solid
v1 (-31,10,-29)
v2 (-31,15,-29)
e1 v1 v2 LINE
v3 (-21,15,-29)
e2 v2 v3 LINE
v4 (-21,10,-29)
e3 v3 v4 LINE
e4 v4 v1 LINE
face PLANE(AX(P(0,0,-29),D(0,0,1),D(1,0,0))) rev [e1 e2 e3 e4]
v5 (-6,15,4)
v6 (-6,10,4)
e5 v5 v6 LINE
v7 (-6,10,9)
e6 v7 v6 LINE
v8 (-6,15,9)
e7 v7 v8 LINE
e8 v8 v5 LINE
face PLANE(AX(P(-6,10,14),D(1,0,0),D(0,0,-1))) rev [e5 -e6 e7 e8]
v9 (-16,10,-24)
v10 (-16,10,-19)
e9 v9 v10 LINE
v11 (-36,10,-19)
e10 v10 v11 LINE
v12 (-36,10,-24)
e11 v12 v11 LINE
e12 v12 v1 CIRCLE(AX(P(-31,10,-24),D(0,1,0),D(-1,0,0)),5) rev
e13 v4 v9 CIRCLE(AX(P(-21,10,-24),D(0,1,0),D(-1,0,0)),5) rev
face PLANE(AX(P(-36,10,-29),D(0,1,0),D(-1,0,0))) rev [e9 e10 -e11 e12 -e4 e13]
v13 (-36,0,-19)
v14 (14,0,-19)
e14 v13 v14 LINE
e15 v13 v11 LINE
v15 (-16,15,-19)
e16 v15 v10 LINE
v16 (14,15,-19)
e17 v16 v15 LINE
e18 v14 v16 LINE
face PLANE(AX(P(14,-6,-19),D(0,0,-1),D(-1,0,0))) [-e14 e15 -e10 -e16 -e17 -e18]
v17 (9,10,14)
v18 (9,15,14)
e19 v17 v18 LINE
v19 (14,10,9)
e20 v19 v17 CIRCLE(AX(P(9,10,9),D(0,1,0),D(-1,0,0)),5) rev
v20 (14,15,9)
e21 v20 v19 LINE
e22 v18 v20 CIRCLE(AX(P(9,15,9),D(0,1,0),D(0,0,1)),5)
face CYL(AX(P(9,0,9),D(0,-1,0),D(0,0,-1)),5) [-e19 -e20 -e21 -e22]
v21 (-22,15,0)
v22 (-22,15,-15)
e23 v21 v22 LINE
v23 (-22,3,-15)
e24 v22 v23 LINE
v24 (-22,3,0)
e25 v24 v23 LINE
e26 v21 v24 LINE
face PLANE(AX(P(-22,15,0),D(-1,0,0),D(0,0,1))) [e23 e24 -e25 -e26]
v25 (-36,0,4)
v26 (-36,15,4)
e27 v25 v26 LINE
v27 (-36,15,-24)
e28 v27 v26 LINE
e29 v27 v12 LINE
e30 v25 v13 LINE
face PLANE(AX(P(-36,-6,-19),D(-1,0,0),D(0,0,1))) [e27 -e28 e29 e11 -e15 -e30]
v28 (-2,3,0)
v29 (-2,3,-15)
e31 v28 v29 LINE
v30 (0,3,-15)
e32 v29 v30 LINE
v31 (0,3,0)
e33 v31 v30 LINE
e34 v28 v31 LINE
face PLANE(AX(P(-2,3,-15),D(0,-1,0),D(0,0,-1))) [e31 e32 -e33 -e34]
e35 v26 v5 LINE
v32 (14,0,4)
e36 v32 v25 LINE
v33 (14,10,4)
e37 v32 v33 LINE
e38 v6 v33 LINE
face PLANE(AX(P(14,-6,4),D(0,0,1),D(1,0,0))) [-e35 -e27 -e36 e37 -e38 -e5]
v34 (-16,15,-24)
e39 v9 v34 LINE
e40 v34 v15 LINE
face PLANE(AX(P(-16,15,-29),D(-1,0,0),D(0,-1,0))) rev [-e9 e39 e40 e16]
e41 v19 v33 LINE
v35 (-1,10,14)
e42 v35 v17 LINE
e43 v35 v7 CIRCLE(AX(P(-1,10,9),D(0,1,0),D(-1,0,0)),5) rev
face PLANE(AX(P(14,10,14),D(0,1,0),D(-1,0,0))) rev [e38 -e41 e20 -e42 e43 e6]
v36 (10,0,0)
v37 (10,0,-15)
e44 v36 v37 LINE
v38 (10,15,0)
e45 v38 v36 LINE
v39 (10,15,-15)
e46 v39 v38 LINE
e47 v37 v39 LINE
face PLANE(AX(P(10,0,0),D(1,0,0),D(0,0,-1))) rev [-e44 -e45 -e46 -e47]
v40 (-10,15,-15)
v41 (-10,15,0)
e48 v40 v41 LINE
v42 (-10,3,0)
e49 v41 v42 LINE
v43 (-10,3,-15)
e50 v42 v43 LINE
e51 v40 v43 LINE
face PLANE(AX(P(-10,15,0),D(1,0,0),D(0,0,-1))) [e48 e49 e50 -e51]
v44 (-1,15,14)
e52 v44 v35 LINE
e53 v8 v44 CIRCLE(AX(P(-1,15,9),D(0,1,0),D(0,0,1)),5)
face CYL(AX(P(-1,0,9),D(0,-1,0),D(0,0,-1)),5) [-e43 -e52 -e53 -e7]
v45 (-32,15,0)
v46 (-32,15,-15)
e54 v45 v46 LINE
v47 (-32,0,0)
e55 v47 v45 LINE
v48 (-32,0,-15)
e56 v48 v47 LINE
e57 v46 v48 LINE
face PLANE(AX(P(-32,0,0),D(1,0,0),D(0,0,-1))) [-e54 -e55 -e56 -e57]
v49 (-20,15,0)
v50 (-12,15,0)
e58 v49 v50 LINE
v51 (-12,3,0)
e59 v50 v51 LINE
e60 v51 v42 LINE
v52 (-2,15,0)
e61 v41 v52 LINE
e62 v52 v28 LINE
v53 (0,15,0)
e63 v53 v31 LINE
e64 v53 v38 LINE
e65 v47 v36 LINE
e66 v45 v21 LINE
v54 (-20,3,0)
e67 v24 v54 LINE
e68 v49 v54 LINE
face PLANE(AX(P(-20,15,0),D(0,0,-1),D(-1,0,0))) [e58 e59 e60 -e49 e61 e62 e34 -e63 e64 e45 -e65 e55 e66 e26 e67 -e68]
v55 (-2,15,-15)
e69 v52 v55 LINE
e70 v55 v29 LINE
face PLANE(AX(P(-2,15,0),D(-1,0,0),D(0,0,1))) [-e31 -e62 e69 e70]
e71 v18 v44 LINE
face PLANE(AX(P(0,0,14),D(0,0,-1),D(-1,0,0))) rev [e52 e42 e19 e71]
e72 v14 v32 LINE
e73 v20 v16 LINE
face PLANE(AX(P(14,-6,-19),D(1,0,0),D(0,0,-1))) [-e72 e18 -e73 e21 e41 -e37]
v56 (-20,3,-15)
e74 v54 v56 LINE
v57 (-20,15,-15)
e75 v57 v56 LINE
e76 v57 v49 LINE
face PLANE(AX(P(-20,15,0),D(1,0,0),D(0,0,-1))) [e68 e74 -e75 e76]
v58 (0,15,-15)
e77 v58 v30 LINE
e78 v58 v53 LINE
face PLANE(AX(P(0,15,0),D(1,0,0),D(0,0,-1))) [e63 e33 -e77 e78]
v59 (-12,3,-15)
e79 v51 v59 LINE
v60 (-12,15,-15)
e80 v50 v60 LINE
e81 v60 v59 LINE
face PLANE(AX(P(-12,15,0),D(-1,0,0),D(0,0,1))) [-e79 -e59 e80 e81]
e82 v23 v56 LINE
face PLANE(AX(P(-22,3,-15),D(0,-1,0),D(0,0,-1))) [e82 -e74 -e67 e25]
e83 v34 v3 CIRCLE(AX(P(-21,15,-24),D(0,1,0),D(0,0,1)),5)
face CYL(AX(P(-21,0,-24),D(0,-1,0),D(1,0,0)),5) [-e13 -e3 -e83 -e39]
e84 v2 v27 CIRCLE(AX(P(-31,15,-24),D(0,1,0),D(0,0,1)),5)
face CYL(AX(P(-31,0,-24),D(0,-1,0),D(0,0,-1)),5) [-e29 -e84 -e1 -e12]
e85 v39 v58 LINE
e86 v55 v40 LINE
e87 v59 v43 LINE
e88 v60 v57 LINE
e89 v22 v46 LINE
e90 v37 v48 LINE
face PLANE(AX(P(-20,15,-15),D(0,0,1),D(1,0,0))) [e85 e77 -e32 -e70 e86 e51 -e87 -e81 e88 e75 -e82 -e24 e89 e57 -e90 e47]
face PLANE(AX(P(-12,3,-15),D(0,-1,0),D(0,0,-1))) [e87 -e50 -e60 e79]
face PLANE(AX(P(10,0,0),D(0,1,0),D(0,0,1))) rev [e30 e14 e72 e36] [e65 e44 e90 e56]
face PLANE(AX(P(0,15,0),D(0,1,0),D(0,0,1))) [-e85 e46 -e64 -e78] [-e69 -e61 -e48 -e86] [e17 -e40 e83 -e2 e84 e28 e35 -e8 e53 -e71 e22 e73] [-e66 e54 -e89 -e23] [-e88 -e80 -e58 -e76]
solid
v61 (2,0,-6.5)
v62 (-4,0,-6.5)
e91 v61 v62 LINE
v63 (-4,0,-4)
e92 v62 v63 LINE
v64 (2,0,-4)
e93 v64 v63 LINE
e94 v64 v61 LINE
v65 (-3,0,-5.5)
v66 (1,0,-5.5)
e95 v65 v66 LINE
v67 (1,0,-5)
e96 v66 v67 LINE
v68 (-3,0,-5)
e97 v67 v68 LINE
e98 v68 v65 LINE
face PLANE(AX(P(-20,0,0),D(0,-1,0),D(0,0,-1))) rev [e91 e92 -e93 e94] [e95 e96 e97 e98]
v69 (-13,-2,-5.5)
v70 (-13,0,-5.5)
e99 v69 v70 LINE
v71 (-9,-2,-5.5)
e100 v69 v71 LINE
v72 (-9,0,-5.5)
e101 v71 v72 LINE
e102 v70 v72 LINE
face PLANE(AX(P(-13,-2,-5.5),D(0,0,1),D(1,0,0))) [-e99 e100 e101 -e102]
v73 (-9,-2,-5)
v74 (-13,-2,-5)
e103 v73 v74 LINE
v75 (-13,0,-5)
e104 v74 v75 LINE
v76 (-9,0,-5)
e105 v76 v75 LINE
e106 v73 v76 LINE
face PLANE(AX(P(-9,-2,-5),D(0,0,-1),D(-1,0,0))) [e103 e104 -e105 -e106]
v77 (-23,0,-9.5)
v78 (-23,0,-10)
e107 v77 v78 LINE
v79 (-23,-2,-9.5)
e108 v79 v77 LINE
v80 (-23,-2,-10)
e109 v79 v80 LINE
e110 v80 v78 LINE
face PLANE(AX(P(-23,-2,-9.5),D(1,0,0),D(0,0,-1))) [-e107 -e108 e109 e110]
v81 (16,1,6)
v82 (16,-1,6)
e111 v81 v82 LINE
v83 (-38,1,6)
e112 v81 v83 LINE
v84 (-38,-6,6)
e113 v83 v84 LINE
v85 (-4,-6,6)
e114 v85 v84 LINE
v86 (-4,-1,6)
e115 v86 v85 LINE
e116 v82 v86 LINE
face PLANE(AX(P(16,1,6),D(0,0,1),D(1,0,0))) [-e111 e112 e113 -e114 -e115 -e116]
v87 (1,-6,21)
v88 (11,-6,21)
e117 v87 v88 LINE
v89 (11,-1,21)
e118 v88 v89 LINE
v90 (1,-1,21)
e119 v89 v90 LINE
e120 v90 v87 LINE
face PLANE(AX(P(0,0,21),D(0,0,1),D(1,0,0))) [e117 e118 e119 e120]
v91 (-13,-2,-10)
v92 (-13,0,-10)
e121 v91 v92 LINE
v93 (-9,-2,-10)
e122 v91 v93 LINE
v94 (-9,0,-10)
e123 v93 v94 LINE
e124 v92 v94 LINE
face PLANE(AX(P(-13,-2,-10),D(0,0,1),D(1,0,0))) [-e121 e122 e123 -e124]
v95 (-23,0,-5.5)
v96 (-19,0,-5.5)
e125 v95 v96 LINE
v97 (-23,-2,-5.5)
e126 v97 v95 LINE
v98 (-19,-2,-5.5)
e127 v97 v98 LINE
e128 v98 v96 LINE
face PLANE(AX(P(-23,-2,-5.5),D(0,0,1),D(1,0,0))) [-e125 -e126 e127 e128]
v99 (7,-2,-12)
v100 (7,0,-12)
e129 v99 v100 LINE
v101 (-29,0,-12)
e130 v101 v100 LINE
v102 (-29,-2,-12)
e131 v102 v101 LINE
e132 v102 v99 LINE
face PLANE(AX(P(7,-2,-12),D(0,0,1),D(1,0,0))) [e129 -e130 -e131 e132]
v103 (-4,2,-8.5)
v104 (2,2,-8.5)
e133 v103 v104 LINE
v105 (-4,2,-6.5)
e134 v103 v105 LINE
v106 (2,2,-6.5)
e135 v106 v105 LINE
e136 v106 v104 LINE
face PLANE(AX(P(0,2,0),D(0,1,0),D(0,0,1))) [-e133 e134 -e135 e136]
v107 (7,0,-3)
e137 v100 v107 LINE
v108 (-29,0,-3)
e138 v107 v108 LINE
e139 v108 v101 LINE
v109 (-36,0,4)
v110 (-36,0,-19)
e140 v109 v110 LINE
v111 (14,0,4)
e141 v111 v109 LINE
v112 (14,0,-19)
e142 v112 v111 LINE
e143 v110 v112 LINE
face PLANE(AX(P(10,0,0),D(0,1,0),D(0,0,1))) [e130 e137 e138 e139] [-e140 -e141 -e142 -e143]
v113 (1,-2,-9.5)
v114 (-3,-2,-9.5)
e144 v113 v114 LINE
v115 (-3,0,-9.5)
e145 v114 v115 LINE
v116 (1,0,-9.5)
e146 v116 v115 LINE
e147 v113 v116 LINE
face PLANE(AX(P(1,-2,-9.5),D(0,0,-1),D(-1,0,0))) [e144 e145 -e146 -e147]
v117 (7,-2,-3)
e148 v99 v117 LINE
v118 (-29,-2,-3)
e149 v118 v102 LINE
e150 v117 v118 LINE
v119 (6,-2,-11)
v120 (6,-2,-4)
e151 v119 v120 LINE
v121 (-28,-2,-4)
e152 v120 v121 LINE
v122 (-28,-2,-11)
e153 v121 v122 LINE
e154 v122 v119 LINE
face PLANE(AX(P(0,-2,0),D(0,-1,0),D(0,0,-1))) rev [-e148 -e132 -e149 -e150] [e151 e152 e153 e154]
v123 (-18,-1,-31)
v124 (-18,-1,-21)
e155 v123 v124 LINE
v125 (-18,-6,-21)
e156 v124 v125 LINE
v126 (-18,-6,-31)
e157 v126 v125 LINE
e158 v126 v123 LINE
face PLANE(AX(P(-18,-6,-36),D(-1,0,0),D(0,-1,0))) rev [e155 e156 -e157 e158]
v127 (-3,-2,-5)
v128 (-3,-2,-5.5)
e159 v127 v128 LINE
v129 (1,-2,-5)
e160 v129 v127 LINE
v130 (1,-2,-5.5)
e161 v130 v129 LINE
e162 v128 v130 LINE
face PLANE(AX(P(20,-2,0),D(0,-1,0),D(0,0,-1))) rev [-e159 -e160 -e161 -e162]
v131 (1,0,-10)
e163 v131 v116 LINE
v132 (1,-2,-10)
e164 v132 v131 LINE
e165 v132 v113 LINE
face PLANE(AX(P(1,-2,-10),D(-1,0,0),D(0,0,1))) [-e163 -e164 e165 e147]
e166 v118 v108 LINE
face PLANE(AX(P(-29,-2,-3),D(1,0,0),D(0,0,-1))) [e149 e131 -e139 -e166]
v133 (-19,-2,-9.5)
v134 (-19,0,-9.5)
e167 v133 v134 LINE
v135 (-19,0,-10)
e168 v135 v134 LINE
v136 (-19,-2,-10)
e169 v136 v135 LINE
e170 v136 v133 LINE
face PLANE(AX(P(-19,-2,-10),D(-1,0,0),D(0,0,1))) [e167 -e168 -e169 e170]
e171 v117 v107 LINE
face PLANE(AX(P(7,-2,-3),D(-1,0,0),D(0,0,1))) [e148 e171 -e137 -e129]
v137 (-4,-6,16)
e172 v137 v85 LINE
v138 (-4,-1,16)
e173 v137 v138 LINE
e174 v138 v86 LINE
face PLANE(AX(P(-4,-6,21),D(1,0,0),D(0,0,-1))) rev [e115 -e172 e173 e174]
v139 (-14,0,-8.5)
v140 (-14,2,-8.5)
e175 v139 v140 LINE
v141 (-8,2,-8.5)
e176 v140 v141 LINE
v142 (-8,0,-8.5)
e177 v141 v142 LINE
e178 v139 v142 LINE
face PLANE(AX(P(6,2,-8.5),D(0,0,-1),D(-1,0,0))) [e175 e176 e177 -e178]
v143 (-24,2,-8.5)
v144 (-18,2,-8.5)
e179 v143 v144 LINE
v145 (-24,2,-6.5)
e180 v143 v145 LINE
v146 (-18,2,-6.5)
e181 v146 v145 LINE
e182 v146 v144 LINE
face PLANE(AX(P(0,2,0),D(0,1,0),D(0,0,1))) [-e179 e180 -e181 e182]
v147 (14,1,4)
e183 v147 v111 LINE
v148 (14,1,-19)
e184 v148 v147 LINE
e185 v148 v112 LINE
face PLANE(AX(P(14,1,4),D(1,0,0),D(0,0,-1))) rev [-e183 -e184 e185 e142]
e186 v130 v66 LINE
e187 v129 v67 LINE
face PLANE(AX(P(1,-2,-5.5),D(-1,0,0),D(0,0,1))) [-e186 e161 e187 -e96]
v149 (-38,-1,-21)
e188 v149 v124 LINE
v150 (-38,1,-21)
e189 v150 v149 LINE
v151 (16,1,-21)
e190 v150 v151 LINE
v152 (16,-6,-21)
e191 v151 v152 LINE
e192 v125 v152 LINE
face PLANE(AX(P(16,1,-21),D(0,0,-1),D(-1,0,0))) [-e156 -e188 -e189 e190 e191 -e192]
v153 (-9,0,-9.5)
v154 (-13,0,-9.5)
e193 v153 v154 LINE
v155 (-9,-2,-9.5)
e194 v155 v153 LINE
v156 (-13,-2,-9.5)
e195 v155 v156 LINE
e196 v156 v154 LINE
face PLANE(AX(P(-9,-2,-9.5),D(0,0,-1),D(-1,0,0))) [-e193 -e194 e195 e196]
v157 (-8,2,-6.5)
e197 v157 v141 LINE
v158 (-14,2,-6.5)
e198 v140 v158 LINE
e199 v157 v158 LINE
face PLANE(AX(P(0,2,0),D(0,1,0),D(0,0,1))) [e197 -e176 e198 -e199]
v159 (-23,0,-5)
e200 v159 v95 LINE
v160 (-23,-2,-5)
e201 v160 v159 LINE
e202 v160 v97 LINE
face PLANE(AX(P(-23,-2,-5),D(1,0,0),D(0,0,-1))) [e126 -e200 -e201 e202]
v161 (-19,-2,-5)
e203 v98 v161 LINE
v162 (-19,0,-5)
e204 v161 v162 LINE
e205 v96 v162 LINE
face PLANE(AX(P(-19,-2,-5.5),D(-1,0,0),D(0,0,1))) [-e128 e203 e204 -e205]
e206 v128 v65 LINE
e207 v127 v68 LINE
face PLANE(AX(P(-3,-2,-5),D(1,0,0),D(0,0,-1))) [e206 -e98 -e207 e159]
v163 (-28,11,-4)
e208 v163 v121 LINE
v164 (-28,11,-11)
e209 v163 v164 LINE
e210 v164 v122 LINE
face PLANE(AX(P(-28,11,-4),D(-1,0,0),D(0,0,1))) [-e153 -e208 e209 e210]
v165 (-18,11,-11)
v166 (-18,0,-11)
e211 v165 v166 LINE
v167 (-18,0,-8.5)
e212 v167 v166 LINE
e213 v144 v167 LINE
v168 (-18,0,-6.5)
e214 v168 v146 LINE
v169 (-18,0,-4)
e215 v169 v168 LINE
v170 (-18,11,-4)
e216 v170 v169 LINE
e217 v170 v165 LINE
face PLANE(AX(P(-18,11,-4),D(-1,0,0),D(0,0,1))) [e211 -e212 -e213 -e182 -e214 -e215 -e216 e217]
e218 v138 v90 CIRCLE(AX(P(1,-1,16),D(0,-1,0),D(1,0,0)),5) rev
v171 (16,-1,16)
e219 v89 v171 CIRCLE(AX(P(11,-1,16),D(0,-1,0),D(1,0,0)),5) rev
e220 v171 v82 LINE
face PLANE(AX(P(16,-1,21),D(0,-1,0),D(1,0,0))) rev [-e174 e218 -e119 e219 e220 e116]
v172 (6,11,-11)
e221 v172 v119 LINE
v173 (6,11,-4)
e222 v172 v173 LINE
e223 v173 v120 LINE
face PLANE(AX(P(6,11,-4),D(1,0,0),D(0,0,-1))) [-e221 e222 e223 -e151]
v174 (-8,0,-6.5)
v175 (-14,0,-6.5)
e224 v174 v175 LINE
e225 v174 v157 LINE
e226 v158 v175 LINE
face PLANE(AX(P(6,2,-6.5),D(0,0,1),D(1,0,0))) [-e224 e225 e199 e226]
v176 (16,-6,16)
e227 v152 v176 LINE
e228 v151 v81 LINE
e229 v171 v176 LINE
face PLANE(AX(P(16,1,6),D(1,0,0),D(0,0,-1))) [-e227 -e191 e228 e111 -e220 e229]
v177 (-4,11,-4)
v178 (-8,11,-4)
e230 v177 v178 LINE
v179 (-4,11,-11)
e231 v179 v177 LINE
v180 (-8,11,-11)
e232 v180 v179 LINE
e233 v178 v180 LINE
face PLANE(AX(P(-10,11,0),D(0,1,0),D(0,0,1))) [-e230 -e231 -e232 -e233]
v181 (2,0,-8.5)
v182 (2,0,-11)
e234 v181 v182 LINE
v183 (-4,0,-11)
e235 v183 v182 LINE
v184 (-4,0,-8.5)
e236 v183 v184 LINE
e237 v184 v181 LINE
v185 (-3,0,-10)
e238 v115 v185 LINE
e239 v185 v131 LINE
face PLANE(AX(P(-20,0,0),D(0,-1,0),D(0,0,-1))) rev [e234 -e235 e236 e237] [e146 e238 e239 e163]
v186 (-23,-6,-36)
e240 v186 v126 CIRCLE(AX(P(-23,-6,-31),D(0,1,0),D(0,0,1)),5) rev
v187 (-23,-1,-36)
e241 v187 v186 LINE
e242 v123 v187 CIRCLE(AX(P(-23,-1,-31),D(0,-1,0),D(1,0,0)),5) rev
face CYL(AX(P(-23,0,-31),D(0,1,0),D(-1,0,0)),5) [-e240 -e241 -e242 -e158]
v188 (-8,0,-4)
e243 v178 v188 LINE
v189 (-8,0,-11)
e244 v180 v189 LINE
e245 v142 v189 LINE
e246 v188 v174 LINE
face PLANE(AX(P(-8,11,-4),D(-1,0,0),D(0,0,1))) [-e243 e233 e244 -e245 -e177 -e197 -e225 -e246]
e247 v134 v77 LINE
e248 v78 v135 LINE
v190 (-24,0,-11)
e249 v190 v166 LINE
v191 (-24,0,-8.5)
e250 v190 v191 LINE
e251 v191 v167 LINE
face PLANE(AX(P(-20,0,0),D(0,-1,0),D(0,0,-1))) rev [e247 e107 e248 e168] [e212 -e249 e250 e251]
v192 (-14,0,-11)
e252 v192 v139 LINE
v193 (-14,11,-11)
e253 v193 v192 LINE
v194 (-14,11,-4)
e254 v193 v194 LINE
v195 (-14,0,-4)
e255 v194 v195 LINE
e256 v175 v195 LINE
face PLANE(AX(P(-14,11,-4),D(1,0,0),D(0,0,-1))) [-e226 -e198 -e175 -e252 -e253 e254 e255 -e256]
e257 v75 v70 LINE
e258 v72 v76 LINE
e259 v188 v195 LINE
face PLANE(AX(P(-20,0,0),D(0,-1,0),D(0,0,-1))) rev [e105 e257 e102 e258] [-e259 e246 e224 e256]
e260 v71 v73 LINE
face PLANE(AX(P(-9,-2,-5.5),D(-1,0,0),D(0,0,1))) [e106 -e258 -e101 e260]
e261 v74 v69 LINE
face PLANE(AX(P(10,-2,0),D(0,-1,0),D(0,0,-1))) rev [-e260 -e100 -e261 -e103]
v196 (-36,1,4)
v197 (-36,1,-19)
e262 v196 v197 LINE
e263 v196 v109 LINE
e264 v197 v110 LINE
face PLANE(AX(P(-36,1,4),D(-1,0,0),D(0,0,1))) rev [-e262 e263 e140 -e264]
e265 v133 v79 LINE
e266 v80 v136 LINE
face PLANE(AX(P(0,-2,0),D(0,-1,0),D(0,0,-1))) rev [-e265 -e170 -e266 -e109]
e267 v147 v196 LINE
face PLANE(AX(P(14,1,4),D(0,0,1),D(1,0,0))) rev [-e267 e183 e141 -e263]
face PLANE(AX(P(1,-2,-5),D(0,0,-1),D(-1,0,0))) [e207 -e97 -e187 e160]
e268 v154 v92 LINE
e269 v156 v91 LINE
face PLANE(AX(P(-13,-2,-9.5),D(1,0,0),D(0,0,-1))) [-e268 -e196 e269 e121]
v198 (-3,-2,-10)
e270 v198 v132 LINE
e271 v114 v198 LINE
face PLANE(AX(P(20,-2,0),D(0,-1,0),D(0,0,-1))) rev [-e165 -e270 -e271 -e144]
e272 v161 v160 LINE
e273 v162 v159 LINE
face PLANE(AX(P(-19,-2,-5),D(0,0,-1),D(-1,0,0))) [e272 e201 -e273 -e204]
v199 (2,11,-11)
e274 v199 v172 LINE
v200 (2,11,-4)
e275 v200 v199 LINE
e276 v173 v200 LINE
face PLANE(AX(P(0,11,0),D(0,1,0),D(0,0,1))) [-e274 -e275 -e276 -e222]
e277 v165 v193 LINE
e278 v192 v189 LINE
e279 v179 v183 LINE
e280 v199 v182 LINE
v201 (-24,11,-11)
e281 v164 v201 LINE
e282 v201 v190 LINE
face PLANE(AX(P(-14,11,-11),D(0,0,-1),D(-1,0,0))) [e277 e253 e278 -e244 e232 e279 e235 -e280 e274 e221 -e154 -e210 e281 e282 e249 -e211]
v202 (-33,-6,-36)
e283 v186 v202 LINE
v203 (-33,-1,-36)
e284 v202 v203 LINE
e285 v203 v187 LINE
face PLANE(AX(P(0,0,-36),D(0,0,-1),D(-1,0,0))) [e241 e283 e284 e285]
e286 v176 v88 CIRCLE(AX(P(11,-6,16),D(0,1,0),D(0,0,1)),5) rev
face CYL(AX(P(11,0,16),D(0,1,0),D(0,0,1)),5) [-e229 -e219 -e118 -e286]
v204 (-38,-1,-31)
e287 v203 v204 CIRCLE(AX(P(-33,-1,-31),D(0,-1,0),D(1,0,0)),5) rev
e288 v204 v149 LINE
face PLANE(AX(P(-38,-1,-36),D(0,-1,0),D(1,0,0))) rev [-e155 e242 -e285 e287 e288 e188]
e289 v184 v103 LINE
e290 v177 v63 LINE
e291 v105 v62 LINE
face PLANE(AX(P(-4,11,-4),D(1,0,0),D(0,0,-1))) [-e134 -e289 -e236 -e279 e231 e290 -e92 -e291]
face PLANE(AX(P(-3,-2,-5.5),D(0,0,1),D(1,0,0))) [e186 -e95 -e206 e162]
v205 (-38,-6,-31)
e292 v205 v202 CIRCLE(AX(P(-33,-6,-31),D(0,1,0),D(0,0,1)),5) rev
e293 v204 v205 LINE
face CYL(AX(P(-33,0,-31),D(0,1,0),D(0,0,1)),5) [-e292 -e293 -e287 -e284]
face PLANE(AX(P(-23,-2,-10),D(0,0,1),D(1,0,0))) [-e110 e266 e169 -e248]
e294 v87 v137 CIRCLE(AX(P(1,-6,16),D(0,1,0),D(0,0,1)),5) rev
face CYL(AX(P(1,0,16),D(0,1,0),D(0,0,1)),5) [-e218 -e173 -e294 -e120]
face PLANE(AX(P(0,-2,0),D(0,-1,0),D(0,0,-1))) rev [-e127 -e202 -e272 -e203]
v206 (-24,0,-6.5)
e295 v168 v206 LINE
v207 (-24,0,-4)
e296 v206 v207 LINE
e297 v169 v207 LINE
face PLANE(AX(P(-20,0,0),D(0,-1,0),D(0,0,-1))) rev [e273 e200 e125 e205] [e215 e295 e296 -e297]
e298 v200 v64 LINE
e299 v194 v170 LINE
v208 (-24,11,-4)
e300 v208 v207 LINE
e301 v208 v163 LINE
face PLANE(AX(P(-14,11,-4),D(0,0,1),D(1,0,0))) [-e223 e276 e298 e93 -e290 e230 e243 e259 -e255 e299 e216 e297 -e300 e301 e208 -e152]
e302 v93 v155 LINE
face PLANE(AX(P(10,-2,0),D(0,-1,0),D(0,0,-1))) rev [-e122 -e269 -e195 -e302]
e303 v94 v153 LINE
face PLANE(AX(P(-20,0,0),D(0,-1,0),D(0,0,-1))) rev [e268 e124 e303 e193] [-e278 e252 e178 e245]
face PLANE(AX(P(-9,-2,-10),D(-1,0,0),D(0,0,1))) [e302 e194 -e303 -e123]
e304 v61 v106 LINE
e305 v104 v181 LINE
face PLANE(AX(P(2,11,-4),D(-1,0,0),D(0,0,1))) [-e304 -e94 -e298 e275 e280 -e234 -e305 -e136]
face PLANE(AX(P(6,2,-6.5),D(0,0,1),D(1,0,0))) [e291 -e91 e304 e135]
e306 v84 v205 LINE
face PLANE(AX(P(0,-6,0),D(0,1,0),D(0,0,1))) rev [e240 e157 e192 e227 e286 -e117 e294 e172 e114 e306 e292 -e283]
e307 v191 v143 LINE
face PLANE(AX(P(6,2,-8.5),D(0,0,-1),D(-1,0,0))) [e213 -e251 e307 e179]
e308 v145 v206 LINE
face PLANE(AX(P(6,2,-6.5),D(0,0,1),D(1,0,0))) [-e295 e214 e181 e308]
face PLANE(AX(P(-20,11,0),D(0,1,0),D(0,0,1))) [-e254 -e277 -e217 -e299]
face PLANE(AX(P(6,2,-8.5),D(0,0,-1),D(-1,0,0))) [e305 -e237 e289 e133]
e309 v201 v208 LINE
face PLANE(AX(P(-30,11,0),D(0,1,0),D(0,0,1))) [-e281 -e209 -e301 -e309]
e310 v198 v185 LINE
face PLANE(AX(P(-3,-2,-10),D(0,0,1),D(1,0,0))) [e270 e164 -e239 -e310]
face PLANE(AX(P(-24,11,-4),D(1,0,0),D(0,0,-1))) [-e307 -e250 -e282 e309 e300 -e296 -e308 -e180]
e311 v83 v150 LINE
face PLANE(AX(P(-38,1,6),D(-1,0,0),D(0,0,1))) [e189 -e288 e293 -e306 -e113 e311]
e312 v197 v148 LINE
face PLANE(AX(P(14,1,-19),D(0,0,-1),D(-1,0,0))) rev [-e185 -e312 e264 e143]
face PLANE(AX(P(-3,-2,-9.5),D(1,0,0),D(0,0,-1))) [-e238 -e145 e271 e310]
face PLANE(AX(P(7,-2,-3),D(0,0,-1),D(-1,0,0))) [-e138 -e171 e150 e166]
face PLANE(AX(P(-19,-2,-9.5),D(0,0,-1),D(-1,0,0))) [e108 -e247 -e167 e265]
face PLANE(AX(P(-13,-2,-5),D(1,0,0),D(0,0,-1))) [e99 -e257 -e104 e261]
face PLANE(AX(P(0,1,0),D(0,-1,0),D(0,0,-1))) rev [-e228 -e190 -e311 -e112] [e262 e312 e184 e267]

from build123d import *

# Parameters (mm, degrees)
SKETCH1_W                = 8
SKETCH1_H                = 15
BOSS_EXTRUDE1_DEPTH      = 15
SKETCH2_W                = 4
SKETCH2_H                = 7
CUT_EXTRUDE1_DEPTH       = 11
SKETCH3_W                = 15
SKETCH3_H                = 3
BOSS_EXTRUDE2_DEPTH      = 2
LPATTERN1_COUNT          = 4
LPATTERN1_PITCH          = 10
SKETCH4_W                = 15
SKETCH4_H                = 12
BOSS_EXTRUDE3_DEPTH      = 2
SKETCH5_W                = 15
SKETCH5_H                = 15
BOSS_EXTRUDE4_DEPTH      = 2
SKETCH6_W                = 34
SKETCH6_H                = 2
CUT_EXTRUDE2_DEPTH       = 2
SKETCH7_W                = 36
SKETCH7_H                = 9
SKETCH7_W_2              = 34
SKETCH7_H_2              = 7
BOSS_EXTRUDE5_DEPTH      = 2
SKETCH8_W                = 4
SKETCH8_H                = 0.5
BOSS_EXTRUDE6_DEPTH      = 2
LPATTERN2_COUNT          = 3
LPATTERN2_PITCH          = 10
BOSS_EXTRUDE7_DEPTH      = 15
BOSS_EXTRUDE7_DEPTH_BACK = 6
SKETCH9_W                = 50
SKETCH9_H                = 23
SPLIT1_START             = -6
SPLIT1_OUTLINE_W         = 50
SPLIT1_OUTLINE_H         = 23
SPLIT1_DEPTH             = 6
SPLIT1_2_OUTLINE_W       = 4
SPLIT1_2_OUTLINE_H       = 7
SPLIT1_2_DEPTH           = 11
SPLIT1_3_OUTLINE_W       = 6
SPLIT1_3_OUTLINE_H       = 2
SPLIT1_3_DEPTH           = 2
SPLIT1_START_2           = -19
SPLIT1_4_DEPTH           = 23
SPLIT1_START_3           = -11
SPLIT1_5_DEPTH           = 7
SPLIT1_6_OUTLINE_W       = 36
SPLIT1_6_OUTLINE_H       = 2
SPLIT1_6_DEPTH           = 7
SPLIT1_START_4           = -3
SPLIT1_7_OUTLINE_W       = 36
SPLIT1_7_OUTLINE_H       = 2
SPLIT1_7_DEPTH           = 7
SPLIT1_START_5           = -8.5
SPLIT1_8_DEPTH           = 2
SPLIT1_START_6           = -9.5
SPLIT1_9_OUTLINE_W       = 4
SPLIT1_9_OUTLINE_H       = 2
SPLIT1_9_DEPTH           = 4
SPLIT1_10_OUTLINE_W      = 4
SPLIT1_10_OUTLINE_H      = 2
SPLIT1_10_DEPTH          = 1
SPLIT1_START_7           = -5
SPLIT1_11_OUTLINE_W      = 4
SPLIT1_11_OUTLINE_H      = 2
SPLIT1_11_DEPTH          = 1
SKETCH11_W               = 20
SKETCH11_H               = 5
BOSS_EXTRUDE8_DEPTH      = 10
SKETCH12_W               = 20
SKETCH12_H               = 5
BOSS_EXTRUDE9_DEPTH      = 10
FILLET1_R                = 5
SKETCH13_W               = 54
SKETCH13_H               = 27
SKETCH13_W_2             = 50
SKETCH13_H_2             = 23
BOSS_EXTRUDE11_DEPTH     = 7
SKETCH14_W               = 20
SKETCH14_H               = 5
BOSS_EXTRUDE12_DEPTH     = 15
SKETCH15_W               = 20
SKETCH15_H               = 5
BOSS_EXTRUDE13_DEPTH     = 15
FILLET2_R                = 5


# Read off the part's stored shape, not the designer's step: Split1
with BuildPart() as part:
    # Sketch1 → Boss-Extrude1 (new body)
    with BuildSketch(Plane(origin=(0, 0, 0), x_dir=(1, 0, 0), z_dir=(0, 1, 0))):
        with Locations((4, 7.5)):
            Rectangle(SKETCH1_W, SKETCH1_H)
    extrude(amount=BOSS_EXTRUDE1_DEPTH)

    # Sketch2 → Cut-Extrude1 (cut)
    with BuildSketch(Plane.XZ):
        with Locations((4, -7.5)):
            Rectangle(SKETCH2_W, SKETCH2_H)
    extrude(amount=-CUT_EXTRUDE1_DEPTH, mode=Mode.SUBTRACT)

    # Sketch3 → Boss-Extrude2 (add)
    with BuildSketch(Plane.ZY):
        with Locations((-7.5, 1.5)):
            Rectangle(SKETCH3_W, SKETCH3_H)
    extrude(amount=BOSS_EXTRUDE2_DEPTH)


with BuildPart() as lpattern1_1:
    # LPattern1: pattern copy
    add(part.part.moved(Location(Vector(-1, 0, 0) * (1 * LPATTERN1_PITCH))))


with BuildPart() as lpattern1_2:
    # LPattern1: pattern copy
    add(part.part.moved(Location(Vector(-1, 0, 0) * (2 * LPATTERN1_PITCH))))


with BuildPart() as lpattern1_3:
    # LPattern1: pattern copy
    add(part.part.moved(Location(Vector(-1, 0, 0) * (3 * LPATTERN1_PITCH))))


with BuildPart() as lpattern1_2_1:
    add(lpattern1_2.part)

    # Combine1: union LPattern1_1, part, LPattern1_3
    add(lpattern1_1.part)
    add(part.part)
    add(lpattern1_3.part)

    # Sketch4 → Boss-Extrude3 (add)
    with BuildSketch(Plane.ZY.offset(30)):
        with Locations((-7.5, 9)):
            Rectangle(SKETCH4_W, SKETCH4_H)
    extrude(amount=BOSS_EXTRUDE3_DEPTH)

    # Sketch5 → Boss-Extrude4 (add)
    with BuildSketch(Plane(origin=(8, 0, 0), x_dir=(0, 0, -1), z_dir=(1, 0, 0))):
        with Locations((7.5, 7.5)):
            Rectangle(SKETCH5_W, SKETCH5_H)
    extrude(amount=BOSS_EXTRUDE4_DEPTH)

    # Sketch6 → Cut-Extrude2 (cut)
    with BuildSketch(Plane(origin=(0, 0, 0), x_dir=(-1, 0, 0), z_dir=(0, -1, 0))):
        with Locations((11, 7.5)):
            Rectangle(SKETCH6_W, SKETCH6_H)
    extrude(amount=-CUT_EXTRUDE2_DEPTH, mode=Mode.SUBTRACT)

    # Sketch7 → Boss-Extrude5 (add)
    with BuildSketch(Plane.XZ):
        with Locations((-11, -7.5)):
            Rectangle(SKETCH7_W, SKETCH7_H)
        with Locations((-11, -7.5)):
            Rectangle(SKETCH7_W_2, SKETCH7_H_2, mode=Mode.SUBTRACT)
    extrude(amount=BOSS_EXTRUDE5_DEPTH)

    # Sketch8 → Boss-Extrude6 (add)
    with BuildSketch(Plane.XZ):
        with Locations((-21, -9.75)):
            Rectangle(SKETCH8_W, SKETCH8_H)
        with Locations((-21, -5.25)):
            Rectangle(SKETCH8_W, SKETCH8_H)
    boss_extrude6 = extrude(amount=BOSS_EXTRUDE6_DEPTH)

    # LPattern2: Boss-Extrude6 ×3
    with Locations(*[(i * LPATTERN2_PITCH, 0, 0) for i in range(1, LPATTERN2_COUNT)]):
        add(boss_extrude6)


with BuildPart() as body_2:
    # Sketch9 → Boss-Extrude7 (new, two sides: drawn at the far end of the back side and taken through both)
    with BuildSketch(Plane(origin=(0, 0, 0), x_dir=(1, 0, 0), z_dir=(0, 1, 0)).offset(-BOSS_EXTRUDE7_DEPTH_BACK)):
        with Locations((-11, 7.5)):
            Rectangle(SKETCH9_W, SKETCH9_H)
    extrude(amount=BOSS_EXTRUDE7_DEPTH + BOSS_EXTRUDE7_DEPTH_BACK)

    # Combine2: cut LPattern1_2
    add(lpattern1_2_1.part, mode=Mode.SUBTRACT)

    # Split1 outline → Split1 (cut)
    with BuildSketch(Plane(origin=(0, 0, 0), x_dir=(1, 0, 0), z_dir=(0, 1, 0)).offset(SPLIT1_START)):
        with Locations((-11, 7.5)):
            Rectangle(SPLIT1_OUTLINE_W, SPLIT1_OUTLINE_H)
    extrude(amount=SPLIT1_DEPTH, mode=Mode.SUBTRACT)

    # Split1 2 outline → Split1 2 (cut)
    with BuildSketch(Plane(origin=(0, 0, 0), x_dir=(1, 0, 0), z_dir=(0, 1, 0))):
        with Locations((-26, 7.5)):
            Rectangle(SPLIT1_2_OUTLINE_W, SPLIT1_2_OUTLINE_H)
        with Locations((-16, 7.5)):
            Rectangle(SPLIT1_2_OUTLINE_W, SPLIT1_2_OUTLINE_H)
        with Locations((-6, 7.5)):
            Rectangle(SPLIT1_2_OUTLINE_W, SPLIT1_2_OUTLINE_H)
        with Locations((4, 7.5)):
            Rectangle(SPLIT1_2_OUTLINE_W, SPLIT1_2_OUTLINE_H)
    extrude(amount=SPLIT1_2_DEPTH, mode=Mode.SUBTRACT)

    # Split1 3 outline → Split1 3 (cut)
    with BuildSketch(Plane(origin=(0, 0, 0), x_dir=(1, 0, 0), z_dir=(0, 1, 0))):
        with Locations((-21, 7.5)):
            Rectangle(SPLIT1_3_OUTLINE_W, SPLIT1_3_OUTLINE_H)
        with Locations((-11, 7.5)):
            Rectangle(SPLIT1_3_OUTLINE_W, SPLIT1_3_OUTLINE_H)
        with Locations((-1, 7.5)):
            Rectangle(SPLIT1_3_OUTLINE_W, SPLIT1_3_OUTLINE_H)
    extrude(amount=SPLIT1_3_DEPTH, mode=Mode.SUBTRACT)

    # Sketch11 → Boss-Extrude8 (add)
    with BuildSketch(Plane.XY.offset(4)):
        with Locations((4, 12.5)):
            Rectangle(SKETCH11_W, SKETCH11_H)
    extrude(amount=BOSS_EXTRUDE8_DEPTH)

    # Sketch12 → Boss-Extrude9 (add)
    with BuildSketch(Plane(origin=(0, 0, -19), x_dir=(-1, 0, 0), z_dir=(0, 0, -1))):
        with Locations((26, 12.5)):
            Rectangle(SKETCH12_W, SKETCH12_H)
    extrude(amount=BOSS_EXTRUDE9_DEPTH)

    # Fillet1
    fillet1_edges = [body_2.edges().sort_by_distance(p)[0] for p in [
        (-6, 12.5, 14),
        (14, 12.5, 14),
        (-36, 12.5, -29),
        (-16, 12.5, -29),
    ]]
    fillet(fillet1_edges, radius=FILLET1_R)


with BuildPart() as body_2_2:
    # Split1 4 outline → Split1 4 (new body)
    with BuildSketch(Plane.XY.offset(SPLIT1_START_2)):
        Polygon((7, -2), (-29, -2), (-29, 0), (-36, 0), (-36, -6), (14, -6), (14, 0), (7, 0), align=None)
    extrude(amount=SPLIT1_4_DEPTH)

    # Split1 5 outline → Split1 5 (add)
    with BuildSketch(Plane.XY.offset(SPLIT1_START_3)):
        Polygon((2, 11), (2, 0), (1, 0), (1, -2), (6, -2), (6, 11), align=None)
        Polygon((-4, 0), (-4, 11), (-8, 11), (-8, 0), (-9, 0), (-9, -2), (-3, -2), (-3, 0), align=None)
        Polygon((-14, 0), (-14, 11), (-18, 11), (-18, 0), (-19, 0), (-19, -2), (-13, -2), (-13, 0), align=None)
        Polygon((-28, -2), (-23, -2), (-23, 0), (-24, 0), (-24, 11), (-28, 11), align=None)
    extrude(amount=SPLIT1_5_DEPTH)

    # Split1 6 outline → Split1 6 (add)
    with BuildSketch(Plane.XY.offset(SPLIT1_START_2)):
        with Locations((-11, -1)):
            Rectangle(SPLIT1_6_OUTLINE_W, SPLIT1_6_OUTLINE_H)
    extrude(amount=SPLIT1_6_DEPTH)

    # Split1 7 outline → Split1 7 (add)
    with BuildSketch(Plane.XY.offset(SPLIT1_START_4)):
        with Locations((-11, -1)):
            Rectangle(SPLIT1_7_OUTLINE_W, SPLIT1_7_OUTLINE_H)
    extrude(amount=SPLIT1_7_DEPTH)

    # Split1 8 outline → Split1 8 (add)
    with BuildSketch(Plane.XY.offset(SPLIT1_START_5)):
        Polygon((2, 0), (2, 2), (-4, 2), (-4, 0), (-3, 0), (-3, -2), (1, -2), (1, 0), align=None)
        Polygon((-9, 0), (-8, 0), (-8, 2), (-14, 2), (-14, 0), (-13, 0), (-13, -2), (-9, -2), align=None)
        Polygon((-23, -2), (-19, -2), (-19, 0), (-18, 0), (-18, 2), (-24, 2), (-24, 0), (-23, 0), align=None)
    extrude(amount=SPLIT1_8_DEPTH)

    # Split1 9 outline → Split1 9 (add)
    with BuildSketch(Plane.XY.offset(SPLIT1_START_6)):
        with Locations((-1, -1)):
            Rectangle(SPLIT1_9_OUTLINE_W, SPLIT1_9_OUTLINE_H)
        with Locations((-11, -1)):
            Rectangle(SPLIT1_9_OUTLINE_W, SPLIT1_9_OUTLINE_H)
        with Locations((-21, -1)):
            Rectangle(SPLIT1_9_OUTLINE_W, SPLIT1_9_OUTLINE_H)
    extrude(amount=SPLIT1_9_DEPTH)

    # Split1 10 outline → Split1 10 (add)
    with BuildSketch(Plane.XY.offset(SPLIT1_START_3)):
        with Locations((-1, -1)):
            Rectangle(SPLIT1_10_OUTLINE_W, SPLIT1_10_OUTLINE_H)
        with Locations((-11, -1)):
            Rectangle(SPLIT1_10_OUTLINE_W, SPLIT1_10_OUTLINE_H)
        with Locations((-21, -1)):
            Rectangle(SPLIT1_10_OUTLINE_W, SPLIT1_10_OUTLINE_H)
    extrude(amount=SPLIT1_10_DEPTH)

    # Split1 11 outline → Split1 11 (add)
    with BuildSketch(Plane.XY.offset(SPLIT1_START_7)):
        with Locations((-1, -1)):
            Rectangle(SPLIT1_11_OUTLINE_W, SPLIT1_11_OUTLINE_H)
        with Locations((-11, -1)):
            Rectangle(SPLIT1_11_OUTLINE_W, SPLIT1_11_OUTLINE_H)
        with Locations((-21, -1)):
            Rectangle(SPLIT1_11_OUTLINE_W, SPLIT1_11_OUTLINE_H)
    extrude(amount=SPLIT1_11_DEPTH)

    # Sketch13 → Boss-Extrude11 (add)
    with BuildSketch(Plane.XZ.offset(6)):
        with Locations((-11, -7.5)):
            Rectangle(SKETCH13_W, SKETCH13_H)
        with Locations((-11, -7.5)):
            Rectangle(SKETCH13_W_2, SKETCH13_H_2, mode=Mode.SUBTRACT)
    extrude(amount=-BOSS_EXTRUDE11_DEPTH)

    # Sketch14 → Boss-Extrude12 (add)
    with BuildSketch(Plane.XY.offset(6)):
        with Locations((6, -3.5)):
            Rectangle(SKETCH14_W, SKETCH14_H)
    extrude(amount=BOSS_EXTRUDE12_DEPTH)

    # Sketch15 → Boss-Extrude13 (add)
    with BuildSketch(Plane(origin=(0, 0, -21), x_dir=(-1, 0, 0), z_dir=(0, 0, -1))):
        with Locations((28, -3.5)):
            Rectangle(SKETCH15_W, SKETCH15_H)
    extrude(amount=BOSS_EXTRUDE13_DEPTH)

    # Fillet2
    fillet2_edges = [body_2_2.edges().sort_by_distance(p)[0] for p in [
        (16, -3.5, 21),
        (-4, -3.5, 21),
        (-38, -3.5, -36),
        (-18, -3.5, -36),
    ]]
    fillet(fillet2_edges, radius=FILLET2_R)


solid = Compound([body_2.part, body_2_2.part])
